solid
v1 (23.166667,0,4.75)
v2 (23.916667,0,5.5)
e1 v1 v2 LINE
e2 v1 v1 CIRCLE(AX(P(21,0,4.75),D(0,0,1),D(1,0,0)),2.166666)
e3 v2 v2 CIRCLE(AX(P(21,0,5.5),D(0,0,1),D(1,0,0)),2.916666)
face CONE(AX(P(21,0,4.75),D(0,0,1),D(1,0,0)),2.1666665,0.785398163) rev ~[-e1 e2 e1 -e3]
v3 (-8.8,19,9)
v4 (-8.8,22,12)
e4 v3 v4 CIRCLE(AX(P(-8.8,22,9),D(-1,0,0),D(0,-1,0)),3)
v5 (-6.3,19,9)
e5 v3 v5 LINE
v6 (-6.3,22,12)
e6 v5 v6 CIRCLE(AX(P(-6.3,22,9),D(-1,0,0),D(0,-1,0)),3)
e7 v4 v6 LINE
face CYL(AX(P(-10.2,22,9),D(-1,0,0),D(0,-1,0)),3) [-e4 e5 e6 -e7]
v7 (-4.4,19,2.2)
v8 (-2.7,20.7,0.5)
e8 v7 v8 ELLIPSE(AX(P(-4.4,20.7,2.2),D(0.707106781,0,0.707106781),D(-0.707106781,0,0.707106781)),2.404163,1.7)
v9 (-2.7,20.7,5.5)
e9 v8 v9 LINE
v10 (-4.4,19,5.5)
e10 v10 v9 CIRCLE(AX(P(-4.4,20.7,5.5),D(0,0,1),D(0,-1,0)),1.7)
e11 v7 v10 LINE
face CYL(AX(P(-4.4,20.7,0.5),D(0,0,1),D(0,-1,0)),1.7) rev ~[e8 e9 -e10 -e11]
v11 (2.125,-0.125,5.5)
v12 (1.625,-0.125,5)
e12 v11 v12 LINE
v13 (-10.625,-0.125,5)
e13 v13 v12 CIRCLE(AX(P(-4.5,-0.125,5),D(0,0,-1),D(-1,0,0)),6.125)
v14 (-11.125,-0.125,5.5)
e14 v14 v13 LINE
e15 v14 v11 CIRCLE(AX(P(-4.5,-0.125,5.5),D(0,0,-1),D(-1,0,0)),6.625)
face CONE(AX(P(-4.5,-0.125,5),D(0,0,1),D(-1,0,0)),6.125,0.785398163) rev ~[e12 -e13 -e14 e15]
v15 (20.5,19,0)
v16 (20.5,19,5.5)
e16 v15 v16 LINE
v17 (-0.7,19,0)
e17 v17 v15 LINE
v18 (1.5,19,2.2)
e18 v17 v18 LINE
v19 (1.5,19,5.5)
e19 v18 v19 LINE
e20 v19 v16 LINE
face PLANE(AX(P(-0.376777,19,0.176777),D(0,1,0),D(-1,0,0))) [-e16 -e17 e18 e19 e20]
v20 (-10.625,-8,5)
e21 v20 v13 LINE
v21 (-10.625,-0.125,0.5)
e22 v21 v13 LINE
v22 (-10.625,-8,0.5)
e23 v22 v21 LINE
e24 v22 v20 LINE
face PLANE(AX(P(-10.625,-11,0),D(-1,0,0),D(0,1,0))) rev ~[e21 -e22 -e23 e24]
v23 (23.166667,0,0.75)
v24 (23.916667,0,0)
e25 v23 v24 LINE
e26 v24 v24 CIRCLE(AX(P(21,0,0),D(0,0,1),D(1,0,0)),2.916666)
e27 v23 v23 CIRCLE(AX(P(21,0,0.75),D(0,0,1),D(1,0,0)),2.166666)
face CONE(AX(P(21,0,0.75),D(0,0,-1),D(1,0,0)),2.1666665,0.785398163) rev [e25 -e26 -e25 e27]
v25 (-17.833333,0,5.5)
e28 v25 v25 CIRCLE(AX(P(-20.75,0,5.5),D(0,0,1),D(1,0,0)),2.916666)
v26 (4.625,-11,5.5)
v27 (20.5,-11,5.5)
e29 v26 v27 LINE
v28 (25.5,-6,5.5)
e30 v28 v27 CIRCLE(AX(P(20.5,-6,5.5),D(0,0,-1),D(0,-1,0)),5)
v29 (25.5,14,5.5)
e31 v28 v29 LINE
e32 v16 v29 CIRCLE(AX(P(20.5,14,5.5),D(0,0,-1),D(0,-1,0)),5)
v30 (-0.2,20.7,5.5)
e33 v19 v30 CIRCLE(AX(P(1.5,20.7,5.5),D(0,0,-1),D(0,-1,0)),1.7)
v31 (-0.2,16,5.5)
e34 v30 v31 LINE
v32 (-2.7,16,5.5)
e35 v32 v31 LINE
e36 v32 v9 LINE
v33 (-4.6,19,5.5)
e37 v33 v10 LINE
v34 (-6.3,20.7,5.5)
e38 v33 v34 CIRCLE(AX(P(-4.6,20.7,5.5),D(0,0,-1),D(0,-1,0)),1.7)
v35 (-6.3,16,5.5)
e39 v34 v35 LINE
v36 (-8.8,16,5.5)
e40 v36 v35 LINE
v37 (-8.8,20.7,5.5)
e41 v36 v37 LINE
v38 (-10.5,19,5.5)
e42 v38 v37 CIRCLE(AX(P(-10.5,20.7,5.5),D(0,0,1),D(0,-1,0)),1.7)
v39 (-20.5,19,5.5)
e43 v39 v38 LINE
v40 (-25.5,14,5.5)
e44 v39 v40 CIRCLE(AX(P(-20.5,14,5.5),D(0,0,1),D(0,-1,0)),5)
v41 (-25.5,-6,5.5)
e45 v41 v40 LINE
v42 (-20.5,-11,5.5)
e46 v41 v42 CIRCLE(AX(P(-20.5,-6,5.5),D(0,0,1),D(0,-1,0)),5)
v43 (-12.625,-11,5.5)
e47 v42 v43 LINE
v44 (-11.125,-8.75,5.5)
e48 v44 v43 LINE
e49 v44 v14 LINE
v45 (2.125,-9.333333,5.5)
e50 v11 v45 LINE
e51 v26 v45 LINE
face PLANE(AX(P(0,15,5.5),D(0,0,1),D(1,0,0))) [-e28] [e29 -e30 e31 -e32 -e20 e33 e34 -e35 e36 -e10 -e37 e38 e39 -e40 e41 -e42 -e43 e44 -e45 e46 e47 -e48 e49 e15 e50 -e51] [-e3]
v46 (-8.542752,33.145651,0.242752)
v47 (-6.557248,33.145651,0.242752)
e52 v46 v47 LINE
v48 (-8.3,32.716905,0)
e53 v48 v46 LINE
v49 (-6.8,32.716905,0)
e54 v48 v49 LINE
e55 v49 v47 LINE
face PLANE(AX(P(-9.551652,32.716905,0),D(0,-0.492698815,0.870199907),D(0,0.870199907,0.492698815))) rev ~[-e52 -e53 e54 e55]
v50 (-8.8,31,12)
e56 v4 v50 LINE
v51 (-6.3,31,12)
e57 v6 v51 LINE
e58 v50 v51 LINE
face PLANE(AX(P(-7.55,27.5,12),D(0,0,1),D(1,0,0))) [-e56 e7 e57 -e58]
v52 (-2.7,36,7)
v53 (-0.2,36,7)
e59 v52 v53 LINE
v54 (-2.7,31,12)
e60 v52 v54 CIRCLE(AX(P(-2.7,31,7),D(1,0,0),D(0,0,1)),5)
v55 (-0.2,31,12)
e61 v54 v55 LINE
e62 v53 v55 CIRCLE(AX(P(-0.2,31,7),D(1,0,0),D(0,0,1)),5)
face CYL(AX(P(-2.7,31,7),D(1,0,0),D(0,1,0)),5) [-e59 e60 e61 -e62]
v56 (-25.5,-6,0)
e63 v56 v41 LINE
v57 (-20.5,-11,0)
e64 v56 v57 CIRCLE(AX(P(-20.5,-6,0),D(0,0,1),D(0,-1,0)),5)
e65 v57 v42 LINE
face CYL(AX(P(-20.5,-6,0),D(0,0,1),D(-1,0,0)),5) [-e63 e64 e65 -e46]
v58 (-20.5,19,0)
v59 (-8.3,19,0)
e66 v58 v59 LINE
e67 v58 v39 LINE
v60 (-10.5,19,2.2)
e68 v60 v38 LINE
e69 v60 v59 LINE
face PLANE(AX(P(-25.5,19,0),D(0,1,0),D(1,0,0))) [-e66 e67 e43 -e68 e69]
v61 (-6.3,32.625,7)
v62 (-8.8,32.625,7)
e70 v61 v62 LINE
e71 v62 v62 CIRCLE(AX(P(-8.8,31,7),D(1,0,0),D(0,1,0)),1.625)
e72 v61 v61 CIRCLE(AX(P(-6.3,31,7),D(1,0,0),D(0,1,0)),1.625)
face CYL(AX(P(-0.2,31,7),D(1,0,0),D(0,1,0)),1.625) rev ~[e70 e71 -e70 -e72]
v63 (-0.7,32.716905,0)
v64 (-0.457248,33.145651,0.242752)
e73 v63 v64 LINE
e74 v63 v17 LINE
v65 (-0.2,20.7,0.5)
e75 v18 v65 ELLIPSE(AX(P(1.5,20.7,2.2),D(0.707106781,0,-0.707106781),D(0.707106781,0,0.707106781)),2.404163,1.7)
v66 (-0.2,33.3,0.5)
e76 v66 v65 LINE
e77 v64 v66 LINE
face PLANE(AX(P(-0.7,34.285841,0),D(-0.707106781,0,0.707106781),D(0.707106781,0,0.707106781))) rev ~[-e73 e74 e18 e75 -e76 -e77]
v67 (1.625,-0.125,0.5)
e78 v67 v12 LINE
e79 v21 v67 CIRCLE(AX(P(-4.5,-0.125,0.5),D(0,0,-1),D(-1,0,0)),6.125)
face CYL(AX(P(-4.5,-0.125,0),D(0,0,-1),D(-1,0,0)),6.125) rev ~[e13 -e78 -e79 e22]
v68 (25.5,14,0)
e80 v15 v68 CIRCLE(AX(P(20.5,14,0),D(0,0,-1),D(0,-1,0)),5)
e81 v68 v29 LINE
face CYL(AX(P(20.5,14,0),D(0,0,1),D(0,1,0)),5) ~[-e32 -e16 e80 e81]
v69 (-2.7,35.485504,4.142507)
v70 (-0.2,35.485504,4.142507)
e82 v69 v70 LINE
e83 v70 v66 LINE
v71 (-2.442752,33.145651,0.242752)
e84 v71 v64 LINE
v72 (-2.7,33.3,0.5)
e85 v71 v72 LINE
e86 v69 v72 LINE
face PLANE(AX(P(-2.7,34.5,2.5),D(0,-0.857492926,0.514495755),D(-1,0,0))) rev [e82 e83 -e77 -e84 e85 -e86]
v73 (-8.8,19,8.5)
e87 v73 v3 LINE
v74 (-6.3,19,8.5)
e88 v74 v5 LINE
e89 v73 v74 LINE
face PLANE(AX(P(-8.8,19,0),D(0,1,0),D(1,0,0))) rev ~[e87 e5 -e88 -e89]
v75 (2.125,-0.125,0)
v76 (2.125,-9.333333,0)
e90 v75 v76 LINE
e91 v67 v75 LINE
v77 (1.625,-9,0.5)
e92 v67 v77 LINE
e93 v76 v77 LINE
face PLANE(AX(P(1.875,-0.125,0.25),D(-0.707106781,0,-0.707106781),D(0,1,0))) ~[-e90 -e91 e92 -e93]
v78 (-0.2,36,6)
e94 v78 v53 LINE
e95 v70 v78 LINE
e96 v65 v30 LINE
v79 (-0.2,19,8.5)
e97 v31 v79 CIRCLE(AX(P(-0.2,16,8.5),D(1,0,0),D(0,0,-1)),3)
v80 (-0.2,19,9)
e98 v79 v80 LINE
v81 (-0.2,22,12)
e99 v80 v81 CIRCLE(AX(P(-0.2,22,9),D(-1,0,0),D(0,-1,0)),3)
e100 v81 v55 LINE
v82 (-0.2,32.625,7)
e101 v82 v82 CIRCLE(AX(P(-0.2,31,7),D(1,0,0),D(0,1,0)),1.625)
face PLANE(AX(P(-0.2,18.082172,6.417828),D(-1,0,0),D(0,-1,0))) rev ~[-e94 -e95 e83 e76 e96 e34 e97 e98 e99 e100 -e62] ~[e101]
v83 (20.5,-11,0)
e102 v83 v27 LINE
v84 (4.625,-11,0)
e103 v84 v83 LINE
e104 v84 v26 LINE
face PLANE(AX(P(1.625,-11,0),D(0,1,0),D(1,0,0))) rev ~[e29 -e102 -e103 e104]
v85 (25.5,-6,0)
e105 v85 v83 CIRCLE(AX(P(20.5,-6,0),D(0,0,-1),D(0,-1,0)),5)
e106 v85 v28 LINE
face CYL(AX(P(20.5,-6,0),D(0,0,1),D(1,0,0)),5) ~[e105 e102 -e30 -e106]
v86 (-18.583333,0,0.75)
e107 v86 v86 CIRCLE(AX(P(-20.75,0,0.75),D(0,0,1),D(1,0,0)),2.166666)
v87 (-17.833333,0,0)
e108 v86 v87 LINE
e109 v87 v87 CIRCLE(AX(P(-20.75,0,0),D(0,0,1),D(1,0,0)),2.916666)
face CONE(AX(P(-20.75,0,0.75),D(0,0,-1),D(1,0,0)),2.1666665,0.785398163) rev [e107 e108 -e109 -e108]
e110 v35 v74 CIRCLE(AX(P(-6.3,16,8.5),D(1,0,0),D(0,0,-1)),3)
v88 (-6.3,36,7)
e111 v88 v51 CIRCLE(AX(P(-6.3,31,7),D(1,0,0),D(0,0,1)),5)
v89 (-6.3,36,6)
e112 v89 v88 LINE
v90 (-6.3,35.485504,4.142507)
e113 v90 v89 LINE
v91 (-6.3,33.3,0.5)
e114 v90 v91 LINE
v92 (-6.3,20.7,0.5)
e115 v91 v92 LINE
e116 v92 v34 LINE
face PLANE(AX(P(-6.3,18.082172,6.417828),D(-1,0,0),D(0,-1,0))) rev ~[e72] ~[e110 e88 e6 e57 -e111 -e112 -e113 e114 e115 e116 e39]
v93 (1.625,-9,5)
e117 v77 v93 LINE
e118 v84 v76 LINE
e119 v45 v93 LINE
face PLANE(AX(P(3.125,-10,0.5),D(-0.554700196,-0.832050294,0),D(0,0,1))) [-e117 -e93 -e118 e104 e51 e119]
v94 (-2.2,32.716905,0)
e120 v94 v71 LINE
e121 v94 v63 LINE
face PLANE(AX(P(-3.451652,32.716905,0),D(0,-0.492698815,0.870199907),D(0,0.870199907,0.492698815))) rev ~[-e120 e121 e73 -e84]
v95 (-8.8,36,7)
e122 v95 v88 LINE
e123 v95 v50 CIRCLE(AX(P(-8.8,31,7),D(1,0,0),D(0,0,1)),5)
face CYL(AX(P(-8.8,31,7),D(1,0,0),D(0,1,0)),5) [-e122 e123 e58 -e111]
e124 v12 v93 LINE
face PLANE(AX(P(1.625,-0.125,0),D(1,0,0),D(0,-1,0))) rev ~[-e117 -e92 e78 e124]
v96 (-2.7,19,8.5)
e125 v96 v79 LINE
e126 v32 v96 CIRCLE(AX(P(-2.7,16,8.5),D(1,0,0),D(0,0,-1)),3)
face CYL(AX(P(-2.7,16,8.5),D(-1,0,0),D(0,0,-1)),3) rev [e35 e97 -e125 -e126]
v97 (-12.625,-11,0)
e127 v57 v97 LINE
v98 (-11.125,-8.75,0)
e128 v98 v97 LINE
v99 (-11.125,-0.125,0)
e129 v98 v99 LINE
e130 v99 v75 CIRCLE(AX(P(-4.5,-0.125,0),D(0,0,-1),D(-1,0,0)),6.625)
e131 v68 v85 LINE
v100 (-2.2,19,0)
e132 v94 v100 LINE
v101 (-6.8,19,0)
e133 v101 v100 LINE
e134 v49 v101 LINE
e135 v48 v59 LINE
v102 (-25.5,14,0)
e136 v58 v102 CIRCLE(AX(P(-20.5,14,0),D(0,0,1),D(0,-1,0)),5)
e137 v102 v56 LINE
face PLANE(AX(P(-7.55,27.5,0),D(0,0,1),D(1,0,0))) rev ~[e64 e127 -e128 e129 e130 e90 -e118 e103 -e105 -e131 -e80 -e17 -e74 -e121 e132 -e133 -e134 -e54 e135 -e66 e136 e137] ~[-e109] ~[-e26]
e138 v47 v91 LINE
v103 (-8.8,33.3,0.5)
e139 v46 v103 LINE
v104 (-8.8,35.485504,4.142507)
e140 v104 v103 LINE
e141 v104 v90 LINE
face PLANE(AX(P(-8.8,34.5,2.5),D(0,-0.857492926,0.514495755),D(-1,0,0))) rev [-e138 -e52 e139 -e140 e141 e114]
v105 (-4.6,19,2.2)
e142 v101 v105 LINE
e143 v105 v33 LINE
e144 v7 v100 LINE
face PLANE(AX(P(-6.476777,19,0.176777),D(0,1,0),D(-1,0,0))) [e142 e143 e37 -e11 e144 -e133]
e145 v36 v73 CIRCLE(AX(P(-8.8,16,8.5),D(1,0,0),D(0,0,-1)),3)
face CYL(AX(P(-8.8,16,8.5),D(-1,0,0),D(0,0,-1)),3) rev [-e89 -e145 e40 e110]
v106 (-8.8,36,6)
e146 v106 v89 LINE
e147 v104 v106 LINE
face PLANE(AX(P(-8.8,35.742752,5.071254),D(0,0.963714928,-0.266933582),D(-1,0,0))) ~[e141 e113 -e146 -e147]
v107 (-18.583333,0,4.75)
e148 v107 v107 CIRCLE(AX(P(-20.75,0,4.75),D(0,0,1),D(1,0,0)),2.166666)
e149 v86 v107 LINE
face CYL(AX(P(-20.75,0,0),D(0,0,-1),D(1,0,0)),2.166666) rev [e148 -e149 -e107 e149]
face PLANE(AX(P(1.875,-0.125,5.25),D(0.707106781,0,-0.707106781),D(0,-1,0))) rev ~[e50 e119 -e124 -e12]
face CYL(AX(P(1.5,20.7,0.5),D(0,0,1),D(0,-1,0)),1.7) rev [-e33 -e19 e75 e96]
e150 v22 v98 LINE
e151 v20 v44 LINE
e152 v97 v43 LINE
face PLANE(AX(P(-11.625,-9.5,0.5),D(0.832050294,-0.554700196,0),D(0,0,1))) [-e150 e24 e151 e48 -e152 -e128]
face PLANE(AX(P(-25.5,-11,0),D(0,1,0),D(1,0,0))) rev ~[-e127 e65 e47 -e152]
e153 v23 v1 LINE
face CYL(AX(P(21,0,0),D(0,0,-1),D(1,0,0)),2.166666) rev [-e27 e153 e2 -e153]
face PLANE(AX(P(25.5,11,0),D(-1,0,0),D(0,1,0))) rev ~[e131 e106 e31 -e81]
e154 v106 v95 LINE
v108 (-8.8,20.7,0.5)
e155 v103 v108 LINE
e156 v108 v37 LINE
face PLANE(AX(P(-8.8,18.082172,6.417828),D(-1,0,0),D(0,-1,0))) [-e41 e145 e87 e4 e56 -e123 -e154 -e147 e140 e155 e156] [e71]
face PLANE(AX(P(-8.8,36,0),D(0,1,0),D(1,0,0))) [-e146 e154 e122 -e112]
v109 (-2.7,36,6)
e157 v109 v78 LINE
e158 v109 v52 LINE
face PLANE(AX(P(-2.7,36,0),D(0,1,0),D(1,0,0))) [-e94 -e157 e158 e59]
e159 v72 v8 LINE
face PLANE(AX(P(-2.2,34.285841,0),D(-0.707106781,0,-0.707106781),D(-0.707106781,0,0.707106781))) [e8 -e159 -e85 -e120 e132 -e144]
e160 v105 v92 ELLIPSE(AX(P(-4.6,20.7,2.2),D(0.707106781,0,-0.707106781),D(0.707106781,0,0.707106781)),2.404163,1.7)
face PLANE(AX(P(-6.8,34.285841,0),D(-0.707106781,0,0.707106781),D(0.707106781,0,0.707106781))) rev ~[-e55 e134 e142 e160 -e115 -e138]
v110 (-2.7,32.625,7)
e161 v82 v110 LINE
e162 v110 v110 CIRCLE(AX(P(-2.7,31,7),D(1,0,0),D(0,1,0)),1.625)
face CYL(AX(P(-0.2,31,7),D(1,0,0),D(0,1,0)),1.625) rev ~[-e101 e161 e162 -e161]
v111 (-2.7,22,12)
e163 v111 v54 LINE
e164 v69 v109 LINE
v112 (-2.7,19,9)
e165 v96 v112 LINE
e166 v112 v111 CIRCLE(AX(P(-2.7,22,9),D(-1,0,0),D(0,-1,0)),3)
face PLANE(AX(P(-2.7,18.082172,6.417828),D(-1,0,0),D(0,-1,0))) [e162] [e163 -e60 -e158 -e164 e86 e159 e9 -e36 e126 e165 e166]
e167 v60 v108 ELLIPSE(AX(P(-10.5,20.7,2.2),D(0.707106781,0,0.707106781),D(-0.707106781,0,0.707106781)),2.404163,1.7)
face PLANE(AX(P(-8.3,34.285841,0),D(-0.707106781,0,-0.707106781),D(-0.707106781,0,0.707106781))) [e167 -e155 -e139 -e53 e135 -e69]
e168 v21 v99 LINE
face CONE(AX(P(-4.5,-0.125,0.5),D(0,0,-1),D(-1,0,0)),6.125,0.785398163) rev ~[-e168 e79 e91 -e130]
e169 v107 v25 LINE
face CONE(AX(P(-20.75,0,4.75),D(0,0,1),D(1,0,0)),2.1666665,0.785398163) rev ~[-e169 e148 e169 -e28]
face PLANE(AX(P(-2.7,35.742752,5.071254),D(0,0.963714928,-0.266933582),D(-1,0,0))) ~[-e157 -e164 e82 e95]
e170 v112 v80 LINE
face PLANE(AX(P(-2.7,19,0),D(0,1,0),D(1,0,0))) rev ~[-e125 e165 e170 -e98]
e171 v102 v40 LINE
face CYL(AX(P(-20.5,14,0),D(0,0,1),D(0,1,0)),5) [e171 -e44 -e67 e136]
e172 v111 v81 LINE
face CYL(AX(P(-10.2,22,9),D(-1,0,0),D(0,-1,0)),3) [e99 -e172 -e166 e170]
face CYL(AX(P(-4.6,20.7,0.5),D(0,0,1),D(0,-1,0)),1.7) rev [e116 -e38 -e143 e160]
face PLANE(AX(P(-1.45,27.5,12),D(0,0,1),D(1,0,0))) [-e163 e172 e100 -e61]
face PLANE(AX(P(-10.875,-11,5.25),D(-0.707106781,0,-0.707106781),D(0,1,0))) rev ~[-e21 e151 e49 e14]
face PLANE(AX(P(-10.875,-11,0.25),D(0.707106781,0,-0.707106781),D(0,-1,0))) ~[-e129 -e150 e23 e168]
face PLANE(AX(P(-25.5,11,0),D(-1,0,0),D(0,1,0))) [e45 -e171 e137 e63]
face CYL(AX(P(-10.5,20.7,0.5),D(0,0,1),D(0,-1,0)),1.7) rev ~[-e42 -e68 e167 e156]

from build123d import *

# Parameters (mm, degrees)
F0_R          = 2.1666665
F1_DEPTH      = 5.5
F2_SIZE       = 0.75
F3_W          = 51
F3_H          = 8
F4_DEPTH      = 5.5
F5_SIZE       = 0.5
F6_W          = 2.5
F6_H          = 17
F7_DEPTH      = 12
F8_R          = 1.625
F9_DEPTH      = 25.301
F10_T1_DEPTH  = 2.5
F10_T3_DEPTH  = 2.5
F10_T8_DEPTH  = 17.5
F10_T14_DEPTH = 17.5
F10_T17_DEPTH = 17.5
F10_T19_DEPTH = 17.5
F11_R         = 5
F12_SIZE2     = 3
F12_SIZE      = 5
F12_2_SIZE2   = 3
F12_2_SIZE    = 5
F13_SIZE      = 1
F14_R         = 5
F15_SIZE2     = 2
F15_SIZE      = 3
F15_2_SIZE2   = 2
F15_2_SIZE    = 3
F16_T1_DEPTH  = 15.285841494
F16_T3_DEPTH  = 4.0033035506
F16_T5_DEPTH  = 4.0033035506
F17_R         = 1.7


# Not quite as in the source:
# - a fillet or chamfer that OpenCascade refuses, or shapes differently, is made with other operations: its cross-section is extruded or revolved along the edge and cut away or added


with BuildPart() as f1:
    # F0 (on Top) → F1 (new body)
    with BuildSketch(Plane.XY):
        with BuildLine():
            Line((25.5, 11), (-25.5, 11))
            Line((-25.5, 11), (-25.5, -11))
            Line((-25.5, -11), (-10.625, -11))
            Line((-10.625, -11), (-10.625, -0.125))
            ThreePointArc((-10.625, -0.125), (-4.5, 6), (1.625, -0.125))
            Line((1.625, -0.125), (1.625, -11))
            Line((1.625, -11), (25.5, -11))
            Line((25.5, -11), (25.5, 11))
        make_face()
        with Locations((-20.75, 0)):
            Circle(F0_R, mode=Mode.SUBTRACT)
        with Locations((21, 0)):
            Circle(F0_R, mode=Mode.SUBTRACT)
    extrude(amount=F1_DEPTH)

    # F2
    f2_edges = [f1.edges().sort_by_distance(p)[0] for p in [
        (-22.916666, 0, 0),
        (18.833334, 0, 0),
        (18.833334, 0, 5.5),
        (-22.916666, 0, 5.5),
    ]]
    chamfer(f2_edges, length=F2_SIZE)

    # F3 (on Top) → F4 (join, through all)
    with BuildSketch(Plane.XY):
        with Locations((0, 15)):
            Rectangle(F3_W, F3_H)
    extrude(amount=F4_DEPTH)

    # F5
    f5_edges = [f1.edges().sort_by_distance(p)[0] for p in [
        (-4.5, 6, 5.5),
        (-4.5, 6, 0),
        (-10.625, -5.5625, 5.5),
        (-10.625, -5.5625, 0),
        (1.625, -5.5625, 0),
        (1.625, -5.5625, 5.5),
    ]]
    chamfer(f5_edges, length=F5_SIZE)

    # F6 (on Top) → F7 (join)
    with BuildSketch(Plane.XY):
        with Locations((-7.55, 27.5)):
            Rectangle(F6_W, F6_H)
        with Locations((-1.45, 27.5)):
            Rectangle(F6_W, F6_H)
    extrude(amount=F7_DEPTH)

    # F8 (on face) → F9 (cut, through all)
    with BuildSketch(Plane.YZ.offset(-0.2)):
        with Locations((31, 7)):
            Circle(F8_R)
    extrude(amount=-F9_DEPTH, mode=Mode.SUBTRACT)

    # F10: fillet of radius 3 on 5 edges, made by hand

    # F10_s2 → F10_t1 (join)
    with BuildSketch(Plane.YZ.offset(-2.7)):
        with BuildLine():
            ThreePointArc((16, 5.5), (18.1213203436, 6.3786796564), (19, 8.5))
            Line((19, 8.5), (19, 5.5))
            Line((19, 5.5), (16, 5.5))
        make_face()
    extrude(amount=F10_T1_DEPTH)

    # F10_s4 → F10_t3 (join)
    with BuildSketch(Plane.YZ.offset(-8.8)):
        with BuildLine():
            ThreePointArc((16, 5.5), (18.1213203436, 6.3786796564), (19, 8.5))
            Line((19, 8.5), (19, 5.5))
            Line((19, 5.5), (16, 5.5))
        make_face()
    extrude(amount=F10_T3_DEPTH)


with BuildPart() as f10_tool6:
    # F10_s7 → F10_t8 (new body)
    with BuildSketch(Plane.YZ.offset(7.3)):
        with BuildLine():
            ThreePointArc((16, 5.5), (18.1213203436, 6.3786796564), (19, 8.5))
            Line((19, 8.5), (19, 5.5))
            Line((19, 5.5), (16, 5.5))
        make_face()
    extrude(amount=-F10_T8_DEPTH)

    split(bisect_by=Plane.YZ.offset(-6.3), keep=Keep.BOTTOM)

    split(bisect_by=Plane.YZ.offset(-8.8), keep=Keep.TOP)


with BuildPart() as f1_1:
    add(f1.part)

    # F10_t5: union F10_tool6
    add(f10_tool6.part)


with BuildPart() as f10_tool12:
    # F10_s13 → F10_t14 (new body)
    with BuildSketch(Plane.YZ.offset(1.2)):
        with BuildLine():
            ThreePointArc((16, 5.5), (18.1213203436, 6.3786796564), (19, 8.5))
            Line((19, 8.5), (19, 5.5))
            Line((19, 5.5), (16, 5.5))
        make_face()
    extrude(amount=-F10_T14_DEPTH)

    split(bisect_by=Plane.YZ.offset(-0.2), keep=Keep.BOTTOM)

    split(bisect_by=Plane.YZ.offset(-2.7), keep=Keep.TOP)


with BuildPart() as f1_2:
    add(f1_1.part)

    # F10_t11: union F10_tool12
    add(f10_tool12.part)

    # F10_s18 → F10_t17 (cut)
    with BuildSketch(Plane.YZ.offset(-10.2)):
        with BuildLine():
            ThreePointArc((19, 9), (19.8786796564, 11.1213203436), (22, 12))
            Line((22, 12), (19, 12))
            Line((19, 12), (19, 9))
        make_face()
    extrude(amount=F10_T17_DEPTH, mode=Mode.SUBTRACT)

    # F10_s20 → F10_t19 (cut)
    with BuildSketch(Plane.YZ.offset(-16.3)):
        with BuildLine():
            ThreePointArc((19, 9), (19.8786796564, 11.1213203436), (22, 12))
            Line((22, 12), (19, 12))
            Line((19, 12), (19, 9))
        make_face()
    extrude(amount=F10_T19_DEPTH, mode=Mode.SUBTRACT)

    # F11
    f11_edges = [f1_2.edges().sort_by_distance(p)[0] for p in [
        (-1.45, 36, 12),
        (-7.55, 36, 12),
    ]]
    fillet(f11_edges, radius=F11_R)

    # F12
    f12_edges = [f1_2.edges().sort_by_distance(p)[0] for p in [
        (-1.45, 36, 0),
    ]]
    f12_side = f1_2.faces().sort_by_distance((-1.45, 36, 3.5))[0]
    chamfer(f12_edges, length=F12_SIZE, length2=F12_SIZE2, reference=f12_side)

    # F12#2
    f12_2_edges = [f1_2.edges().sort_by_distance(p)[0] for p in [
        (-7.55, 36, 0),
    ]]
    f12_2_side = f1_2.faces().sort_by_distance((-7.55, 36, 3.5))[0]
    chamfer(f12_2_edges, length=F12_2_SIZE, length2=F12_2_SIZE2, reference=f12_2_side)

    # F13
    f13_edges = [f1_2.edges().sort_by_distance(p)[0] for p in [
        (-1.45, 36, 5),
        (-7.55, 36, 5),
    ]]
    chamfer(f13_edges, length=F13_SIZE)

    # F14
    f14_edges = [f1_2.edges().sort_by_distance(p)[0] for p in [
        (25.5, -11, 2.75),
        (-25.5, -11, 2.75),
        (25.5, 19, 2.75),
        (-25.5, 19, 2.75),
    ]]
    fillet(f14_edges, radius=F14_R)

    # F15
    f15_edges = [f1_2.edges().sort_by_distance(p)[0] for p in [
        (-10.625, -11, 2.75),
    ]]
    f15_side = f1_2.faces().sort_by_distance((-10.625, -5.5625, 2.75))[0]
    chamfer(f15_edges, length=F15_SIZE, length2=F15_SIZE2, reference=f15_side)

    # F15#2
    f15_2_edges = [f1_2.edges().sort_by_distance(p)[0] for p in [
        (1.625, -11, 2.75),
    ]]
    f15_2_side = f1_2.faces().sort_by_distance((11.08488, -11, 2.75))[0]
    chamfer(f15_2_edges, length=F15_2_SIZE, length2=F15_2_SIZE2, reference=f15_2_side)

    # F16: chamfer of 0.5 on 6 edges, made by hand

    # F16_s2 → F16_t1 (cut)
    with BuildSketch(Plane.XZ.offset(-34.285841494)):
        Polygon((-0.7, 0), (-0.2, 0.5), (-0.2, 0), align=None)
        Polygon((-2.2, 0), (-2.7, 0.5), (-2.7, 0), align=None)
        Polygon((-6.8, 0), (-6.3, 0.5), (-6.3, 0), align=None)
        Polygon((-8.3, 0), (-8.8, 0.5), (-8.8, 0), align=None)
    extrude(amount=F16_T1_DEPTH, mode=Mode.SUBTRACT)

    # F16_s4 → F16_t3 (cut)
    with BuildSketch(Plane.YZ.offset(-3.4516517753)):
        Polygon((32.7169048105, 0), (33.1456512734, 0.2427521223), (33, 0), align=None)
    extrude(amount=F16_T3_DEPTH, mode=Mode.SUBTRACT)

    # F16_s6 → F16_t5 (cut)
    with BuildSketch(Plane.YZ.offset(-9.5516517753)):
        Polygon((32.7169048105, 0), (33.1456512734, 0.2427521223), (33, 0), align=None)
    extrude(amount=F16_T5_DEPTH, mode=Mode.SUBTRACT)

    # F17
    f17_edges = [f1_2.edges().sort_by_distance(p)[0] for p in [
        (-8.8, 19, 3),
        (-6.3, 19, 3),
        (-2.7, 19, 3),
        (-0.2, 19, 3),
    ]]
    fillet(f17_edges, radius=F17_R)


solid = f1_2.part
